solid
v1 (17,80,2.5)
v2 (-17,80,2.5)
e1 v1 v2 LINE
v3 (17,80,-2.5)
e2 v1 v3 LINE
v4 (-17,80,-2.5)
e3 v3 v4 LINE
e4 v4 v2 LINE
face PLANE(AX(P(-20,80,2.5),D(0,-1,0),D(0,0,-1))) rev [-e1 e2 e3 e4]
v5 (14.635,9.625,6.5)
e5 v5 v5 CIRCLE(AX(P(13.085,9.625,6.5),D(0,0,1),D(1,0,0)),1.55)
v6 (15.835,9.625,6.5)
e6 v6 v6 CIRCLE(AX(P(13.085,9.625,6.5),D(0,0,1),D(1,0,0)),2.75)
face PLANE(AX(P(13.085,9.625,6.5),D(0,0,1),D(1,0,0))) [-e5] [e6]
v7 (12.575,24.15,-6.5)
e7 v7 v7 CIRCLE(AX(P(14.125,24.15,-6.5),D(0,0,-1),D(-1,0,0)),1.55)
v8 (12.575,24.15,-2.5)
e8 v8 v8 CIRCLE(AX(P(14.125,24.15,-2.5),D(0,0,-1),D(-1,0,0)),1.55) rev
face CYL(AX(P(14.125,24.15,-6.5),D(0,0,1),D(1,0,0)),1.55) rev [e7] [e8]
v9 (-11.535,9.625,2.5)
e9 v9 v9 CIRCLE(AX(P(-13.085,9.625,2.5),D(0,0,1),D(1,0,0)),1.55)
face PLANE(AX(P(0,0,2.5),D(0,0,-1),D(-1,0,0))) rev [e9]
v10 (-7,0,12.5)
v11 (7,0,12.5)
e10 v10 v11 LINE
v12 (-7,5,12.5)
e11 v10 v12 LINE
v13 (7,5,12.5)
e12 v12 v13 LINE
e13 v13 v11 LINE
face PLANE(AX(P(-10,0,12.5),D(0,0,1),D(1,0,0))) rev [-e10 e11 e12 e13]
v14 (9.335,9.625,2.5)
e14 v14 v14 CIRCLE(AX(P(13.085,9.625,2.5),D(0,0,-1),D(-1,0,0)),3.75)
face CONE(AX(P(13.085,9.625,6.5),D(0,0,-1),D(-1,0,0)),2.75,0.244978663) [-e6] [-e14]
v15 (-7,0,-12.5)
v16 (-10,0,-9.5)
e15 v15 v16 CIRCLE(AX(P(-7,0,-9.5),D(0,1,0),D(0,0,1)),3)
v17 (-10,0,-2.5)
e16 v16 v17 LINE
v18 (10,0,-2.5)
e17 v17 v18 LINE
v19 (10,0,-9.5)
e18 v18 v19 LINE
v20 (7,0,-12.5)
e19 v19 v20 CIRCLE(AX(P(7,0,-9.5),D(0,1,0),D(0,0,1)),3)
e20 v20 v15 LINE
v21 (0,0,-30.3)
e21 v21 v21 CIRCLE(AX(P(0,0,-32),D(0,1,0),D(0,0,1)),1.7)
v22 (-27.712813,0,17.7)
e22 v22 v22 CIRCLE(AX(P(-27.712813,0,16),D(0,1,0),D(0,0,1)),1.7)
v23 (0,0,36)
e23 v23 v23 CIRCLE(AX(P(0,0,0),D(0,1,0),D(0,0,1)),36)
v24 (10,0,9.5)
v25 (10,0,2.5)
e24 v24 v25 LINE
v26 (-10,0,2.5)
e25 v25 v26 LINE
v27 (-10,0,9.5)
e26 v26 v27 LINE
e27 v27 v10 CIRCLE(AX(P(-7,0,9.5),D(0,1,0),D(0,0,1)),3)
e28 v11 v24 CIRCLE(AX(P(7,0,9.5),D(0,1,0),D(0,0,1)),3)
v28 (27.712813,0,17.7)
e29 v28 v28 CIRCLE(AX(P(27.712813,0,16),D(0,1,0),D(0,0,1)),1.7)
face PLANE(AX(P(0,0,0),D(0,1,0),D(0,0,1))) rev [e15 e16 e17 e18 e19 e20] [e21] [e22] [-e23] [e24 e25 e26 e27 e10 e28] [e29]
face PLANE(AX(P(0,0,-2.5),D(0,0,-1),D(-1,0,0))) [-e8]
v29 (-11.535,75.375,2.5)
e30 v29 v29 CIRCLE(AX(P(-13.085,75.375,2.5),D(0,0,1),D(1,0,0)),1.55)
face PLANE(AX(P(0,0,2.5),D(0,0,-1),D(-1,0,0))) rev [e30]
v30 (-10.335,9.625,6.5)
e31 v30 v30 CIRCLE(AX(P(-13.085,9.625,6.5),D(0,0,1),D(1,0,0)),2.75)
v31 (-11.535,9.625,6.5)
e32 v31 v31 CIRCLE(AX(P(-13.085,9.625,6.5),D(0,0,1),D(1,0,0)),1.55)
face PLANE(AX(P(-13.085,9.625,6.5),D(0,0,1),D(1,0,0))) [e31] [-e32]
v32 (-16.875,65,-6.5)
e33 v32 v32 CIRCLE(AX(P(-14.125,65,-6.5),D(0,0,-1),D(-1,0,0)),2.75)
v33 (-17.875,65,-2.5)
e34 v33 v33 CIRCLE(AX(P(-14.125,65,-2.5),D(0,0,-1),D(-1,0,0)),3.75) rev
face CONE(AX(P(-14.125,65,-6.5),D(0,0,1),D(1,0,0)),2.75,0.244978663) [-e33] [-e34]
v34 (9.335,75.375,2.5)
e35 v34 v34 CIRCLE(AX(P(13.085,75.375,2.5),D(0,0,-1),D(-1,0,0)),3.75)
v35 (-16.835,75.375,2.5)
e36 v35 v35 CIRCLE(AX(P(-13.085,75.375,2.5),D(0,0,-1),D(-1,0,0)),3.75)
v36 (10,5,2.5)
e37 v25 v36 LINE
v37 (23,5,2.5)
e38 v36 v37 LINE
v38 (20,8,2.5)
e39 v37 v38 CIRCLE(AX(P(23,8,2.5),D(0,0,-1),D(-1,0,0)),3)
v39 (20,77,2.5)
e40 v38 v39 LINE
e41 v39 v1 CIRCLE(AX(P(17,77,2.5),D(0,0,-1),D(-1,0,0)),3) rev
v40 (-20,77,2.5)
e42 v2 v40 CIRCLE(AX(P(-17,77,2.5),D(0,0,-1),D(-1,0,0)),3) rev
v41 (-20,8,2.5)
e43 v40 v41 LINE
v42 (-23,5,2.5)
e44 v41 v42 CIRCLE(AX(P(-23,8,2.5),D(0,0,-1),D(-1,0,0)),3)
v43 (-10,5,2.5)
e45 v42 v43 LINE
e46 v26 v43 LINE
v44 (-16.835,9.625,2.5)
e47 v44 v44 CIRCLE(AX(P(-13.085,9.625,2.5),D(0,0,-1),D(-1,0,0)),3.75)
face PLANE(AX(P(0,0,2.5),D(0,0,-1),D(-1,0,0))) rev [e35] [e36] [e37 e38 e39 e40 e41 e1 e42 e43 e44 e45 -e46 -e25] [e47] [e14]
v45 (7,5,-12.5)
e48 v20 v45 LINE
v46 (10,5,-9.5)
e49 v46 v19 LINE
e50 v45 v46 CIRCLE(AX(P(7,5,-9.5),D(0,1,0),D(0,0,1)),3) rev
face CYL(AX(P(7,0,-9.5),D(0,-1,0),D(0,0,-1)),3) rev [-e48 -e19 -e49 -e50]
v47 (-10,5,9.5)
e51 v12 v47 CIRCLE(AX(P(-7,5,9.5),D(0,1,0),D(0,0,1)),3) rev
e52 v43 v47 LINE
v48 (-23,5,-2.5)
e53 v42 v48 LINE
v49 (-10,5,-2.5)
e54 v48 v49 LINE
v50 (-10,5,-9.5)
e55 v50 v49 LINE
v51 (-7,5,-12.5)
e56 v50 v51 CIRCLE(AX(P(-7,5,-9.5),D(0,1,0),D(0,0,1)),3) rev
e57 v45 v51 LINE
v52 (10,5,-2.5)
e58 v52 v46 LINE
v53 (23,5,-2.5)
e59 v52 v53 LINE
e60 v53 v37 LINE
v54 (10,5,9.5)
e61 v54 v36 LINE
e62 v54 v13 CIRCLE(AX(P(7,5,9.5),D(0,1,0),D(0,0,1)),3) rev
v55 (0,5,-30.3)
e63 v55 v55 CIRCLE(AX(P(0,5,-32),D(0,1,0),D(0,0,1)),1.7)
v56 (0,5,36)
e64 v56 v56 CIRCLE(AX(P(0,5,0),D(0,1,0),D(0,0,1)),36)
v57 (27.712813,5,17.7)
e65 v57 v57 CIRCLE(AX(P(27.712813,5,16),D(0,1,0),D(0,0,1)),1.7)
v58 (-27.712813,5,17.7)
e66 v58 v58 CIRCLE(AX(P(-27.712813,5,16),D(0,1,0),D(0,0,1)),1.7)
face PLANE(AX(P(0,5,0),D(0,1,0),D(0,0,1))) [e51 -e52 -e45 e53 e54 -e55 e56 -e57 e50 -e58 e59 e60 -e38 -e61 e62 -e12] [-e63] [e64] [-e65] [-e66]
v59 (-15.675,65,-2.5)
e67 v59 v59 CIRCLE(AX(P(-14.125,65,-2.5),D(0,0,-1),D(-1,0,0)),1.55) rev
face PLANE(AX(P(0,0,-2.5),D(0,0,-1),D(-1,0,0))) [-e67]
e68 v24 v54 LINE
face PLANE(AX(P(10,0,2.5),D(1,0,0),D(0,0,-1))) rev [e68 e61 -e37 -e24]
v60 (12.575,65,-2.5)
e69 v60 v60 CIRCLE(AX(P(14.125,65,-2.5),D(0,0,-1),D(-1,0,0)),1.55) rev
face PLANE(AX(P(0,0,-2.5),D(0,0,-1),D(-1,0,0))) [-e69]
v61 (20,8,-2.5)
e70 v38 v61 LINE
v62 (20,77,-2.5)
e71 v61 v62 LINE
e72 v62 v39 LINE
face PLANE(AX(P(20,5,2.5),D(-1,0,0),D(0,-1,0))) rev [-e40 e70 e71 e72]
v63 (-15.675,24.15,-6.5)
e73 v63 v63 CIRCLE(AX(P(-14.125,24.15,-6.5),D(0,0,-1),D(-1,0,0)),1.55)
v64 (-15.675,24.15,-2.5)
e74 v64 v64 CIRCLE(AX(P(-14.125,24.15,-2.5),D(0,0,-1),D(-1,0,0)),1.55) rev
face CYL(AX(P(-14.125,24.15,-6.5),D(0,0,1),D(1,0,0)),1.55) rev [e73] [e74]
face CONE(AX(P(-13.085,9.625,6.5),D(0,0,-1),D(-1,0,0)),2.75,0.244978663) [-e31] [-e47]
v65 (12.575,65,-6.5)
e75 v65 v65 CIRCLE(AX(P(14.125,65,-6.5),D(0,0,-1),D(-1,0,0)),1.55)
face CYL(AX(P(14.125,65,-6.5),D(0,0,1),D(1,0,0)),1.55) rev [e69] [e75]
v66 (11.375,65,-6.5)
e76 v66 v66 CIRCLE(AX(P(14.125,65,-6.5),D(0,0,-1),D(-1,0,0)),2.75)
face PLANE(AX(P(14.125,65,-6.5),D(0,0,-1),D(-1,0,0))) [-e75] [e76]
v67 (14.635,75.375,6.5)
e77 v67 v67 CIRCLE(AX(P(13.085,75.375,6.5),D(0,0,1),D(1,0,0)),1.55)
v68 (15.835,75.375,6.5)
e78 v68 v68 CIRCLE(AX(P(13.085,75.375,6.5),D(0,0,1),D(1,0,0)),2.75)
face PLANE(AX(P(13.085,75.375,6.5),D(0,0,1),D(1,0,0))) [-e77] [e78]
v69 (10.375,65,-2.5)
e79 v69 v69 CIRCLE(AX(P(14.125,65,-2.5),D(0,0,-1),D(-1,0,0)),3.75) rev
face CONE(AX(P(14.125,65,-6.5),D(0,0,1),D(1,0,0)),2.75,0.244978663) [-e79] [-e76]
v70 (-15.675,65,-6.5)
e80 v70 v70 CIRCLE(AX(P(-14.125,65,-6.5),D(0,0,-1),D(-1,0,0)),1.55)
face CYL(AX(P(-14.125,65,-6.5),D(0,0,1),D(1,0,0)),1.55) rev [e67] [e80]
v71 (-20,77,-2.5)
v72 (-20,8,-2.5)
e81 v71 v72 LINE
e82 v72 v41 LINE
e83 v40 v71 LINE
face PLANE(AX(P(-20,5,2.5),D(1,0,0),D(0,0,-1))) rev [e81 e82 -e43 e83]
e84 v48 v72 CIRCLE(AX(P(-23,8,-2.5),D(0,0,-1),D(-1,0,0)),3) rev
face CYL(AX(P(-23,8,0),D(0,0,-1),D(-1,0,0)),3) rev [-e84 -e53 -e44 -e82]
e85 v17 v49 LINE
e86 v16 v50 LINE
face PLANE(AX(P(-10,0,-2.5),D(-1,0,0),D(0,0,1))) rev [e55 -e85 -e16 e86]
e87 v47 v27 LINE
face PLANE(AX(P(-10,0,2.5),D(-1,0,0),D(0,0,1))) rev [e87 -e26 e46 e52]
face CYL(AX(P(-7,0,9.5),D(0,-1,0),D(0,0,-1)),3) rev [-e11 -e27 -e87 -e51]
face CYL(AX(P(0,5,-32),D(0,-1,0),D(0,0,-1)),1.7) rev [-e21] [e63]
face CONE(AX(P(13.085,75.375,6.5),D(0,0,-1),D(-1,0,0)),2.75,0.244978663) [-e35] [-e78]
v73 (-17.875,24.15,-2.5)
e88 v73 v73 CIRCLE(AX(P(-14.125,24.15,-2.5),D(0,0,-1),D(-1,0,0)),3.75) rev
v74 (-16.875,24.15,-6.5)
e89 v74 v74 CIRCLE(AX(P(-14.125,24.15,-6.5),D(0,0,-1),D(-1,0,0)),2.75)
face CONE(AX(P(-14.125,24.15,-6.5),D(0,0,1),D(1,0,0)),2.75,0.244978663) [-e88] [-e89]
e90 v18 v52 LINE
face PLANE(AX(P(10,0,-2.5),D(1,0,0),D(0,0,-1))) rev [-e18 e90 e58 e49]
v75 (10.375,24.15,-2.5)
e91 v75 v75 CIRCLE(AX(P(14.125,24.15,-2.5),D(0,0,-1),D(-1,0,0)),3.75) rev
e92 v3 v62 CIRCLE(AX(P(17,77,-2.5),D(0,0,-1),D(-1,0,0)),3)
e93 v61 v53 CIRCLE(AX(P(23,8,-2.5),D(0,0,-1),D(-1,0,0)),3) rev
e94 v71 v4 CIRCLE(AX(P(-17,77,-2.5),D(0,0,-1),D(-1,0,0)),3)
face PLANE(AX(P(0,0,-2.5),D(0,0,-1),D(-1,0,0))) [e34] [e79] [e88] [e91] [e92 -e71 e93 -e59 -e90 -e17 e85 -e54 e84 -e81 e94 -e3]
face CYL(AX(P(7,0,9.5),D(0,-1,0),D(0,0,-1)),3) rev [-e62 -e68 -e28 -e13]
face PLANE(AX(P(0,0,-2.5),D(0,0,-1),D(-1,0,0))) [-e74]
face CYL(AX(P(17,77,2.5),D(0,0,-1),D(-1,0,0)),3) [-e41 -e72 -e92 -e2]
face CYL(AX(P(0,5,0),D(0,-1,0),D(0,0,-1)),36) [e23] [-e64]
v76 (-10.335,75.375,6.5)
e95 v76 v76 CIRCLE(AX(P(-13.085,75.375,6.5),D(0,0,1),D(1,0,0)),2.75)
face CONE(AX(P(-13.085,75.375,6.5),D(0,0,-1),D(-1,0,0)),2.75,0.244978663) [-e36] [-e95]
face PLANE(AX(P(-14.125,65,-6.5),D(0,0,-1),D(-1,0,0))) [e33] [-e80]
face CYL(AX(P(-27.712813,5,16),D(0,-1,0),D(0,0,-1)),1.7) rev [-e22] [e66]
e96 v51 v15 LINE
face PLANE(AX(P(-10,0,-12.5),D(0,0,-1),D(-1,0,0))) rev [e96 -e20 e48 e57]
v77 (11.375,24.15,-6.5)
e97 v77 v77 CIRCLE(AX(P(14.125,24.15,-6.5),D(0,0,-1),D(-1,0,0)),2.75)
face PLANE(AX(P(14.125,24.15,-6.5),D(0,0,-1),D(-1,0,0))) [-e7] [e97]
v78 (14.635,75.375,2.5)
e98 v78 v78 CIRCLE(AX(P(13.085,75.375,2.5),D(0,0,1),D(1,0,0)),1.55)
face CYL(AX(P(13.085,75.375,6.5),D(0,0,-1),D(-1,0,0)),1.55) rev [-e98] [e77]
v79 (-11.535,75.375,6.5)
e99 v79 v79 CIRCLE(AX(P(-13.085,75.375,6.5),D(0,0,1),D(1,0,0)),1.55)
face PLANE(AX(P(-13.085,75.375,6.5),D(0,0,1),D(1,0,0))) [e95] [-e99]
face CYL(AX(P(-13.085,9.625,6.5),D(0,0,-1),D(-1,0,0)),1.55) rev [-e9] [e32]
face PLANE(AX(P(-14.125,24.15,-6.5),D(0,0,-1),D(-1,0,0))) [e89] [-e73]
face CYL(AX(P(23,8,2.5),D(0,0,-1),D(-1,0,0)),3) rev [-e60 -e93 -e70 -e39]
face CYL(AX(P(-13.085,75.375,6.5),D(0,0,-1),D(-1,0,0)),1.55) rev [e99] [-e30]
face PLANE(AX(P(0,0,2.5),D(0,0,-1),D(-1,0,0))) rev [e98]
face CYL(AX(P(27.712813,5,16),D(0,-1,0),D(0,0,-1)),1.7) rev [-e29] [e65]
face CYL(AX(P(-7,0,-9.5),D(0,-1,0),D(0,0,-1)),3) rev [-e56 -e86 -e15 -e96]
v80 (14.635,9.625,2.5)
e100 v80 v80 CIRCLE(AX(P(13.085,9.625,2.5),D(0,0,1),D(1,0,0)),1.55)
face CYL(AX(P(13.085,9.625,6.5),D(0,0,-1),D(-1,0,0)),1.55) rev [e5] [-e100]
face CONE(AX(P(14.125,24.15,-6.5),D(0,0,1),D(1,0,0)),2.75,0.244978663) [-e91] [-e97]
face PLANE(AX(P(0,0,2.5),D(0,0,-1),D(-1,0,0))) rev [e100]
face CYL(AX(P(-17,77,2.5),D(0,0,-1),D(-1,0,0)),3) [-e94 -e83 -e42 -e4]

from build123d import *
from OCP.BRepFilletAPI import BRepFilletAPI_MakeChamfer

# Parameters (mm, degrees)
SKETCH1_R           = 36
SKETCH1_R_2         = 1.7
BOSS_EXTRUDE1_DEPTH = 5
SKETCH2_W           = 40
SKETCH2_H           = 75
BOSS_EXTRUDE2_DEPTH = 2.5
SKETCH3_R           = 2.75
SKETCH3_R_2         = 1.55
BOSS_EXTRUDE3_DEPTH = 4
SKETCH4_R           = 2.75
SKETCH4_R_2         = 1.55
BOSS_EXTRUDE4_DEPTH = 4
CHAMFER1_SIZE       = 1
CHAMFER1_SIZE_2     = 4
SKETCH6_W           = 20
SKETCH6_H           = 10
CUT_EXTRUDE1_DEPTH  = 91.647669578
FILLET1_R           = 3


with BuildPart() as part:
    # Sketch1 → Boss-Extrude1 (new body)
    with BuildSketch(Plane(origin=(0, 0, 0), x_dir=(1, 0, 0), z_dir=(0, 1, 0))):
        with Locations(Location((0, 0, 0), (0, 0, 270))):
            Circle(SKETCH1_R)
        with Locations(Location((0, 32, 0), (0, 0, 270))):
            Circle(SKETCH1_R_2, mode=Mode.SUBTRACT)
        with Locations(Location((27.712812921, -16, 0), (0, 0, 270))):
            Circle(SKETCH1_R_2, mode=Mode.SUBTRACT)
        with Locations(Location((-27.712812921, -16, 0), (0, 0, 270))):
            Circle(SKETCH1_R_2, mode=Mode.SUBTRACT)
    extrude(amount=BOSS_EXTRUDE1_DEPTH)

    # Sketch2 → Boss-Extrude2 (add, symmetric)
    with BuildSketch(Plane.XY):
        with Locations((0, 42.5)):
            Rectangle(SKETCH2_W, SKETCH2_H)
    extrude(amount=BOSS_EXTRUDE2_DEPTH, both=True)

    # Sketch3 → Boss-Extrude3 (add)
    # profile 1 of 4: a face of its own
    with BuildSketch(Plane.XY.offset(2.5)):
        with Locations(Location((-13.085, 75.375, 0), (0, 0, 180))):
            Circle(SKETCH3_R)
        with Locations((-13.085, 75.375)):
            Circle(SKETCH3_R_2, mode=Mode.SUBTRACT)
    # profile 2 of 4: a face of its own
    with BuildSketch(Plane.XY.offset(2.5)):
        with Locations(Location((13.085, 75.375, 0), (0, 0, 180))):
            Circle(SKETCH3_R)
        with Locations((13.085, 75.375)):
            Circle(SKETCH3_R_2, mode=Mode.SUBTRACT)
    # profile 3 of 4: a face of its own
    with BuildSketch(Plane.XY.offset(2.5)):
        with Locations(Location((13.085, 9.625, 0), (0, 0, 180))):
            Circle(SKETCH3_R)
        with Locations((13.085, 9.625)):
            Circle(SKETCH3_R_2, mode=Mode.SUBTRACT)
    # profile 4 of 4: a face of its own
    with BuildSketch(Plane.XY.offset(2.5)):
        with Locations(Location((-13.085, 9.625, 0), (0, 0, 180))):
            Circle(SKETCH3_R)
        with Locations((-13.085, 9.625)):
            Circle(SKETCH3_R_2, mode=Mode.SUBTRACT)
    extrude(amount=BOSS_EXTRUDE3_DEPTH)

    # Sketch4 → Boss-Extrude4 (add)
    # profile 1 of 4: a face of its own
    with BuildSketch(Plane(origin=(0, 0, -2.5), x_dir=(-1, 0, 0), z_dir=(0, 0, -1))):
        with Locations((-14.125, 65)):
            Circle(SKETCH4_R)
        with Locations((-14.125, 65)):
            Circle(SKETCH4_R_2, mode=Mode.SUBTRACT)
    # profile 2 of 4: a face of its own
    with BuildSketch(Plane(origin=(0, 0, -2.5), x_dir=(-1, 0, 0), z_dir=(0, 0, -1))):
        with Locations((14.125, 65)):
            Circle(SKETCH4_R)
        with Locations((14.125, 65)):
            Circle(SKETCH4_R_2, mode=Mode.SUBTRACT)
    # profile 3 of 4: a face of its own
    with BuildSketch(Plane(origin=(0, 0, -2.5), x_dir=(-1, 0, 0), z_dir=(0, 0, -1))):
        with Locations((14.125, 24.15)):
            Circle(SKETCH4_R)
        with Locations((14.125, 24.15)):
            Circle(SKETCH4_R_2, mode=Mode.SUBTRACT)
    # profile 4 of 4: a face of its own
    with BuildSketch(Plane(origin=(0, 0, -2.5), x_dir=(-1, 0, 0), z_dir=(0, 0, -1))):
        with Locations((-14.125, 24.15)):
            Circle(SKETCH4_R)
        with Locations((-14.125, 24.15)):
            Circle(SKETCH4_R_2, mode=Mode.SUBTRACT)
    extrude(amount=BOSS_EXTRUDE4_DEPTH)

    # Chamfer1
    chamfer1_edges_1 = [part.edges().sort_by_distance(p)[0] for p in [
        (-10.335, 75.375, 2.5),
    ]]
    chamfer1_side_1 = [part.faces().sort_by_distance(p)[0] for p in [
        (-10.315, 75.375, 2.5),
    ]]
    chamfer1_edges_2 = [part.edges().sort_by_distance(p)[0] for p in [
        (15.835, 75.375, 2.5),
    ]]
    chamfer1_side_2 = [part.faces().sort_by_distance(p)[0] for p in [
        (15.855, 75.375, 2.5),
    ]]
    chamfer1_edges_3 = [part.edges().sort_by_distance(p)[0] for p in [
        (15.835, 9.625, 2.5),
    ]]
    chamfer1_side_3 = [part.faces().sort_by_distance(p)[0] for p in [
        (15.855, 9.625, 2.5),
    ]]
    chamfer1_edges_4 = [part.edges().sort_by_distance(p)[0] for p in [
        (-10.335, 9.625, 2.5),
    ]]
    chamfer1_side_4 = [part.faces().sort_by_distance(p)[0] for p in [
        (-10.315, 9.625, 2.5),
    ]]
    chamfer1_edges_5 = [part.edges().sort_by_distance(p)[0] for p in [
        (-11.375, 65, -2.5),
    ]]
    chamfer1_side_5 = [part.faces().sort_by_distance(p)[0] for p in [
        (-11.355, 65, -2.5),
    ]]
    chamfer1_edges_6 = [part.edges().sort_by_distance(p)[0] for p in [
        (16.875, 65, -2.5),
    ]]
    chamfer1_side_6 = [part.faces().sort_by_distance(p)[0] for p in [
        (16.895, 65, -2.5),
    ]]
    chamfer1_edges_7 = [part.edges().sort_by_distance(p)[0] for p in [
        (-11.375, 24.15, -2.5),
    ]]
    chamfer1_side_7 = [part.faces().sort_by_distance(p)[0] for p in [
        (-11.355, 24.15, -2.5),
    ]]
    chamfer1_edges_8 = [part.edges().sort_by_distance(p)[0] for p in [
        (16.875, 24.15, -2.5),
    ]]
    chamfer1_side_8 = [part.faces().sort_by_distance(p)[0] for p in [
        (16.895, 24.15, -2.5),
    ]]
    chamfer1 = BRepFilletAPI_MakeChamfer(part.part.solid().wrapped)
    for e in chamfer1_edges_1:
        chamfer1.Add(CHAMFER1_SIZE - 0.0001, CHAMFER1_SIZE_2 - 0.0001, e.wrapped, chamfer1_side_1[0].wrapped)
    for e in chamfer1_edges_2:
        chamfer1.Add(CHAMFER1_SIZE - 0.0001, CHAMFER1_SIZE_2 - 0.0001, e.wrapped, chamfer1_side_2[0].wrapped)
    for e in chamfer1_edges_3:
        chamfer1.Add(CHAMFER1_SIZE - 0.0001, CHAMFER1_SIZE_2 - 0.0001, e.wrapped, chamfer1_side_3[0].wrapped)
    for e in chamfer1_edges_4:
        chamfer1.Add(CHAMFER1_SIZE - 0.0001, CHAMFER1_SIZE_2 - 0.0001, e.wrapped, chamfer1_side_4[0].wrapped)
    for e in chamfer1_edges_5:
        chamfer1.Add(CHAMFER1_SIZE - 0.0001, CHAMFER1_SIZE_2 - 0.0001, e.wrapped, chamfer1_side_5[0].wrapped)
    for e in chamfer1_edges_6:
        chamfer1.Add(CHAMFER1_SIZE - 0.0001, CHAMFER1_SIZE_2 - 0.0001, e.wrapped, chamfer1_side_6[0].wrapped)
    for e in chamfer1_edges_7:
        chamfer1.Add(CHAMFER1_SIZE - 0.0001, CHAMFER1_SIZE_2 - 0.0001, e.wrapped, chamfer1_side_7[0].wrapped)
    for e in chamfer1_edges_8:
        chamfer1.Add(CHAMFER1_SIZE - 0.0001, CHAMFER1_SIZE_2 - 0.0001, e.wrapped, chamfer1_side_8[0].wrapped)
    add(Compound.cast(chamfer1.Shape()), mode=Mode.REPLACE)  # a hair under: the kernel refuses the full size

    # Sketch6 → Cut-Extrude1 (cut, through all)
    with BuildSketch(Plane(origin=(0, 5, 0), x_dir=(1, 0, 0), z_dir=(0, 1, 0))):
        with Locations((0, 7.5)):
            Rectangle(SKETCH6_W, SKETCH6_H)
        with Locations((0, -7.5)):
            Rectangle(SKETCH6_W, SKETCH6_H)
    extrude(amount=-CUT_EXTRUDE1_DEPTH, mode=Mode.SUBTRACT)

    # Fillet1
    fillet1_edges = [part.edges().sort_by_distance(p)[0] for p in [
        (-10, 2.5, -12.5),
        (10, 2.5, -12.5),
        (-10, 2.5, 12.5),
        (10, 2.5, 12.5),
        (-20, 80, 0),
        (-20, 5, 0),
        (20, 5, 0),
        (20, 80, 0),
    ]]
    fillet(fillet1_edges, radius=FILLET1_R)


solid = part.part
